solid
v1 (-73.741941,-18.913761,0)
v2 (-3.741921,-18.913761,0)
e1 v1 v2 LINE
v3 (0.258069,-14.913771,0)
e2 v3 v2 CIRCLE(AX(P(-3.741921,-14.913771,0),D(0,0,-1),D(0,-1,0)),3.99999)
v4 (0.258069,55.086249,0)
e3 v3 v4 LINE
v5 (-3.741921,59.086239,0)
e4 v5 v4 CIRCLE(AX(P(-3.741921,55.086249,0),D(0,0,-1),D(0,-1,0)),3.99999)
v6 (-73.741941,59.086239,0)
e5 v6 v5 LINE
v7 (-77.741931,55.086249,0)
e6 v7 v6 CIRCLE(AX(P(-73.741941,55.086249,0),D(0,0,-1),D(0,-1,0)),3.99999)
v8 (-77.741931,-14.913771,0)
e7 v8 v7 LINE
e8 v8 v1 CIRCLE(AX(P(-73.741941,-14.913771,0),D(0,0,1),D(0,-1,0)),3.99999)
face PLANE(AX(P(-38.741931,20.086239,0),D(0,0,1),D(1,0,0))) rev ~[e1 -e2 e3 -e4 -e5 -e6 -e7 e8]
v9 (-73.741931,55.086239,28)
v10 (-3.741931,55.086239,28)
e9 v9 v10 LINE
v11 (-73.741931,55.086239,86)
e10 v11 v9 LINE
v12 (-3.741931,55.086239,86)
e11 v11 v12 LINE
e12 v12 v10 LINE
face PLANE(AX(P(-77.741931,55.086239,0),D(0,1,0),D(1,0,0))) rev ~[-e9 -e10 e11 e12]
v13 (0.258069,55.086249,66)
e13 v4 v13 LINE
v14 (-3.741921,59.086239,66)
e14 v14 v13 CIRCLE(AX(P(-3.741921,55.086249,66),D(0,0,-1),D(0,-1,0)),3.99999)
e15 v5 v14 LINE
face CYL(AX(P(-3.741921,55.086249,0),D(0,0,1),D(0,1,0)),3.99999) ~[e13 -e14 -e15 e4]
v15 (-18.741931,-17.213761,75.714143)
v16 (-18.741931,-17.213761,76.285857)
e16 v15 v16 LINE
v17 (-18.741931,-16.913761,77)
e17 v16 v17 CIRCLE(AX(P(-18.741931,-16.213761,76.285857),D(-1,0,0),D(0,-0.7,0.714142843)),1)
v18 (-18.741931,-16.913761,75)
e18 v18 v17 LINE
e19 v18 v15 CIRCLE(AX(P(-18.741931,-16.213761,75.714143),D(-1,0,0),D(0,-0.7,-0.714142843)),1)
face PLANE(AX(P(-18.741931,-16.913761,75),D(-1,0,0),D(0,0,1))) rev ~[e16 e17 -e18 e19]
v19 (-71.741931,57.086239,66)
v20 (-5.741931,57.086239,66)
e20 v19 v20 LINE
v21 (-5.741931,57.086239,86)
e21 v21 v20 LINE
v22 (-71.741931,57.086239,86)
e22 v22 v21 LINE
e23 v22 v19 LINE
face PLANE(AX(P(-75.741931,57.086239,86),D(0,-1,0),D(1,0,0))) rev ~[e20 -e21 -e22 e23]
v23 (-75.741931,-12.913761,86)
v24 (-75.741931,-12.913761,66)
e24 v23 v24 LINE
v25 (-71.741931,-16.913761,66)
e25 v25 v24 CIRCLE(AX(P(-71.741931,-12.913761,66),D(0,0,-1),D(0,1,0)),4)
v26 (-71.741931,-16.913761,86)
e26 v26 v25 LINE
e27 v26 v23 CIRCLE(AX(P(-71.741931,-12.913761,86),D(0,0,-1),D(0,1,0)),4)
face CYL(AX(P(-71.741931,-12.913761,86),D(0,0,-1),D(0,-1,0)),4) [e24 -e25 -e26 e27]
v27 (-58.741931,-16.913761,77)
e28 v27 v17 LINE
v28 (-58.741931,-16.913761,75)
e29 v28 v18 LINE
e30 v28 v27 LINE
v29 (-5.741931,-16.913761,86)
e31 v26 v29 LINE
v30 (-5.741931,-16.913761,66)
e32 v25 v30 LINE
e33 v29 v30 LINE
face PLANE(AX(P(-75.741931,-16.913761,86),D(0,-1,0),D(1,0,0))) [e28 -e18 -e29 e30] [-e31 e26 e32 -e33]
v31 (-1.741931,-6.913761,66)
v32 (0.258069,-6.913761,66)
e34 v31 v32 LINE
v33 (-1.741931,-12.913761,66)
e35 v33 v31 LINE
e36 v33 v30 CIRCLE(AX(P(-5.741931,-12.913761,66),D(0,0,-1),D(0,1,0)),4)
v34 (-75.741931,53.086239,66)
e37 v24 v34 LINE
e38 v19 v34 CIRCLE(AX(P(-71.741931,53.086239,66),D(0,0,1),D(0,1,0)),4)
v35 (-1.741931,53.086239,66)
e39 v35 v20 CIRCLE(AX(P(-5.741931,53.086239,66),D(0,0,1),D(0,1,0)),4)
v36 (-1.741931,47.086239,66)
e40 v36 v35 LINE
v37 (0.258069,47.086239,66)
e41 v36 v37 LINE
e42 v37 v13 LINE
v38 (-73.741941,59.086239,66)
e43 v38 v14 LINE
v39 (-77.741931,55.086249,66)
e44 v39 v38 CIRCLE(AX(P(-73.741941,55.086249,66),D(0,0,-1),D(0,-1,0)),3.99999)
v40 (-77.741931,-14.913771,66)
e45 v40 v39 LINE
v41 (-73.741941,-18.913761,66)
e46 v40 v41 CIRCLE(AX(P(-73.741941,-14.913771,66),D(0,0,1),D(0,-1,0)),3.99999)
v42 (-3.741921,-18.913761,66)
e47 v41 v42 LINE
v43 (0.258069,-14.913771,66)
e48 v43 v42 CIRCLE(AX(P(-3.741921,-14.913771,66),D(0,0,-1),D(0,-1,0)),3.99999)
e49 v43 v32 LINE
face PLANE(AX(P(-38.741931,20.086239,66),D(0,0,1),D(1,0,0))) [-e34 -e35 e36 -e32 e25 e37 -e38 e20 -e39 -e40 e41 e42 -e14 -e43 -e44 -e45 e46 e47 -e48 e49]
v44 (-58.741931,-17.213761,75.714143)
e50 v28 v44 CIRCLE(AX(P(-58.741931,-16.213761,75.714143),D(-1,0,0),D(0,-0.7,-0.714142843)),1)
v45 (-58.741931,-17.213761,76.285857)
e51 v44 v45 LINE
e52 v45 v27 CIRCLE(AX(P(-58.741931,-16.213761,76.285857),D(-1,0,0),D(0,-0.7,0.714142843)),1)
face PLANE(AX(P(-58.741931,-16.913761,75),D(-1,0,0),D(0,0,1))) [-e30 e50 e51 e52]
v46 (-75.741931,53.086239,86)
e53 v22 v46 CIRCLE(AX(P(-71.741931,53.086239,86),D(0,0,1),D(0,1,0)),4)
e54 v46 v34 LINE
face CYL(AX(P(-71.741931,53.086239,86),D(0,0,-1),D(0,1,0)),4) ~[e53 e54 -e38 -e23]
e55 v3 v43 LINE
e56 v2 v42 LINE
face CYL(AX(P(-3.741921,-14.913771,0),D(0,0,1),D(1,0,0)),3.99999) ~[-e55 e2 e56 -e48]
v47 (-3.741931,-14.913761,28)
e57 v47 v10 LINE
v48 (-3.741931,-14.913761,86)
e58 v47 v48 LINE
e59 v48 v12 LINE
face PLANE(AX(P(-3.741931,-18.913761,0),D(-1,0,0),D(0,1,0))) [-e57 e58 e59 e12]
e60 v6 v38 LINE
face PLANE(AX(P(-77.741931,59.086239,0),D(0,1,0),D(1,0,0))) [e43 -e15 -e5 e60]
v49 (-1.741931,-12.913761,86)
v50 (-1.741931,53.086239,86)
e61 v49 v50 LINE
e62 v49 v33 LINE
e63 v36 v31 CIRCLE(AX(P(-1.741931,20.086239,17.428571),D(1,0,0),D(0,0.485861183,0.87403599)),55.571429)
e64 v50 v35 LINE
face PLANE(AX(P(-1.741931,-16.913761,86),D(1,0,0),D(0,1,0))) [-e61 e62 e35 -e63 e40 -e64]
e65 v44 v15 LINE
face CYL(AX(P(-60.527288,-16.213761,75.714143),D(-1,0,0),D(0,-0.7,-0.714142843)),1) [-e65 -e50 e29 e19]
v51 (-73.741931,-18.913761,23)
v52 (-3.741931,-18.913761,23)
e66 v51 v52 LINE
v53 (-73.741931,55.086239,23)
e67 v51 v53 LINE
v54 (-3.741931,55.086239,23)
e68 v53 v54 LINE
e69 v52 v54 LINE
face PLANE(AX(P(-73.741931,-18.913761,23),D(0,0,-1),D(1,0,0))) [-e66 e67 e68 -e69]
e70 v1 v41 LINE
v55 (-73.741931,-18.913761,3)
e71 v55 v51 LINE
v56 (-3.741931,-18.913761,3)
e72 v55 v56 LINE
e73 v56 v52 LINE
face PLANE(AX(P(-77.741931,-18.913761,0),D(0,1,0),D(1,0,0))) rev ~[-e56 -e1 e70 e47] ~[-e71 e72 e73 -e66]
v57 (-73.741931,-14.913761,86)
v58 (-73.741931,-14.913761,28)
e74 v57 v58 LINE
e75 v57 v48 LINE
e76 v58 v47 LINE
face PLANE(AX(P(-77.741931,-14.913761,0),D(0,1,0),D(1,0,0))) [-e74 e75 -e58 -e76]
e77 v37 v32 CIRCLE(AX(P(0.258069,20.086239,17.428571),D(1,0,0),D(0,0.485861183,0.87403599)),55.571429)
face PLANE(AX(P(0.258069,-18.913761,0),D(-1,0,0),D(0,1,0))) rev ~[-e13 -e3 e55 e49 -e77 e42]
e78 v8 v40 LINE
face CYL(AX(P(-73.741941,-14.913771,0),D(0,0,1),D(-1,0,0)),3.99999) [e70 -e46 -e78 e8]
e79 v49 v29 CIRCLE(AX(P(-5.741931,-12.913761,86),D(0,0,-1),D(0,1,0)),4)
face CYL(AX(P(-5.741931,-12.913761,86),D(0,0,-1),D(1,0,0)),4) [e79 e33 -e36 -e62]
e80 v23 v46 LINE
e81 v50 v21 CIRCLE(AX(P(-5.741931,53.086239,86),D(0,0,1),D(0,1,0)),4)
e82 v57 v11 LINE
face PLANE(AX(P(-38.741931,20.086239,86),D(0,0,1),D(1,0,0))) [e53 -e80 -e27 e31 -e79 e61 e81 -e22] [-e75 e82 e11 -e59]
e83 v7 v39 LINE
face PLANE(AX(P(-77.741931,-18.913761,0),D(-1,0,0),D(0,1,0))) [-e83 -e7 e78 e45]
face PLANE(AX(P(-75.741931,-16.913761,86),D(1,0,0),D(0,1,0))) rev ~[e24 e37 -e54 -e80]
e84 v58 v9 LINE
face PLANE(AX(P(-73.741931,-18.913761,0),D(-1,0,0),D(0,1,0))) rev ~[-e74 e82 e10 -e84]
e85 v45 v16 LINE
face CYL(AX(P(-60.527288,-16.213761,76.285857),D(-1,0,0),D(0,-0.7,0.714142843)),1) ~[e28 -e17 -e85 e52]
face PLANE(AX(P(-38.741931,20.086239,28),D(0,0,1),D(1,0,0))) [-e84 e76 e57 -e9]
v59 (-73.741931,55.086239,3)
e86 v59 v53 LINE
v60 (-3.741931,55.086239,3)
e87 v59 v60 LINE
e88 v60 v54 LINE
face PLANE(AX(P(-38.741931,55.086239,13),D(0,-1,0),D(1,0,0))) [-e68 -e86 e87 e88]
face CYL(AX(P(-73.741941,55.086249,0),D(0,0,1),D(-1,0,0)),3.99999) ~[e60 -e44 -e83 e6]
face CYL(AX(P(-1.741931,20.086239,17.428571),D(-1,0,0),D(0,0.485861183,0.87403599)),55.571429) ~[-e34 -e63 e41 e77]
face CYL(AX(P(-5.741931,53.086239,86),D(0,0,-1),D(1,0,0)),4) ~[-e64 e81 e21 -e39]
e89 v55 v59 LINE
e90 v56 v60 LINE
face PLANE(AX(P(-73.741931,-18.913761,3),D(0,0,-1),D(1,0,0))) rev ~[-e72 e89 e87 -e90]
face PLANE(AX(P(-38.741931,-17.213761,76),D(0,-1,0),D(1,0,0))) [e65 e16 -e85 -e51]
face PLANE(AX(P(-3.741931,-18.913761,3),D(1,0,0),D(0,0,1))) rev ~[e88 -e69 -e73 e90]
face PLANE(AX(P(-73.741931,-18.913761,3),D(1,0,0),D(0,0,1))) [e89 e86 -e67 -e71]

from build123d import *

# Parameters (mm, degrees)
F0_W         = 78
F0_H         = 78
F1_DEPTH     = 86
F2_T         = -4
F4_DEPTH     = 24
F3_W         = 70
F3_H         = 20
F5_DEPTH     = 74
F6_W         = 78
F6_H         = 78
F6_W_2       = 74
F6_H_2       = 74
F7_DEPTH     = 20
F9_DEPTH     = 2
F10_R        = 3.99999
F11_R        = 4
F12_W        = 40
F12_H        = 2
F13_DEPTH    = 0.3
F14_T1_DEPTH = 43.5707142143
F15_T1_DEPTH = 43.5707142143


# Not quite as in the source:
# - a fillet or chamfer that OpenCascade refuses, or shapes differently, is made with other operations: its cross-section is extruded or revolved along the edge and cut away or added
# - a fillet or chamfer is up to 0.001 mm smaller than in the source, because OpenCascade refuses the exact size


with BuildPart() as f1:
    # F0 (on Top) → F1 (new body)
    with BuildSketch(Plane.XY):
        with Locations((-38.7419309749, 20.0862393249)):
            Rectangle(F0_W, F0_H)
    extrude(amount=F1_DEPTH)

    # F2
    f2_openings = [f1.faces().sort_by_distance(p)[0] for p in [
        (-38.741931, 20.086239, 86),
    ]]
    offset(amount=F2_T, openings=f2_openings)

    # F4 (add): a face of the model
    f4_faces = [f1.faces().sort_by_distance(p)[0] for p in [
        (-38.7419309749, 20.0862393249, 4),
    ]]
    extrude(f4_faces, amount=F4_DEPTH)

    # F3 (on face) → F5 (cut)
    with BuildSketch(Plane.XZ.offset(18.9137606751)):
        with Locations((-38.7419309749, 13)):
            Rectangle(F3_W, F3_H)
    extrude(amount=-F5_DEPTH, mode=Mode.SUBTRACT)

    # F6 (on face) → F7 (cut)
    with BuildSketch(Plane.XY.offset(86)):
        with Locations((-38.7419309749, 20.0862393249)):
            Rectangle(F6_W, F6_H)
        with Locations((-38.7419309749, 20.0862393249)):
            Rectangle(F6_W_2, F6_H_2, mode=Mode.SUBTRACT)
    extrude(amount=-F7_DEPTH, mode=Mode.SUBTRACT)

    # F8 (on face) → F9 (join)
    with BuildSketch(Plane.YZ.offset(-1.7419309749)):
        with BuildLine():
            Line((-6.9137606751, 66), (47.0862393249, 66))
            ThreePointArc((47.0862393249, 66), (20.0862393249, 73), (-6.9137606751, 66))
        make_face()
    extrude(amount=F9_DEPTH)

    # F10 (radius 4 in the source; OpenCascade refuses exactly that, so slightly less here)
    f10_edges = [f1.edges().sort_by_distance(p)[0] for p in [
        (-77.741931, -18.913761, 33),
        (0.258069, -18.913761, 33),
        (0.258069, 59.086239, 33),
        (-77.741931, 59.086239, 33),
    ]]
    fillet(f10_edges, radius=F10_R)

    # F11
    f11_edges = [f1.edges().sort_by_distance(p)[0] for p in [
        (-1.741931, -16.913761, 76),
        (-1.741931, 57.086239, 76),
        (-75.741931, -16.913761, 76),
        (-75.741931, 57.086239, 76),
    ]]
    fillet(f11_edges, radius=F11_R)

    # F12 (on face) → F13 (join)
    with BuildSketch(Plane.XZ.offset(16.9137606751)):
        with Locations((-38.7419309749, 76)):
            Rectangle(F12_W, F12_H)
    extrude(amount=F13_DEPTH)

    # F14: fillet of radius 1 on 1 edges, made by hand

    # F14_s2 → F14_t1 (cut)
    with BuildSketch(Plane.YZ.offset(-60.527288082)):
        with BuildLine():
            ThreePointArc((-16.9137606751, 77), (-17.1357151208, 76.6731554918), (-17.2137606751, 76.2858571571))
            Line((-17.2137606751, 76.2858571571), (-17.2137606751, 77))
            Line((-17.2137606751, 77), (-16.9137606751, 77))
        make_face()
    extrude(amount=F14_T1_DEPTH, mode=Mode.SUBTRACT)

    # F15: fillet of radius 1 on 1 edges, made by hand

    # F15_s2 → F15_t1 (cut)
    with BuildSketch(Plane.YZ.offset(-60.527288082)):
        with BuildLine():
            ThreePointArc((-16.9137606751, 75), (-17.1357151208, 75.3268445082), (-17.2137606751, 75.7141428429))
            Line((-17.2137606751, 75.7141428429), (-17.2137606751, 75))
            Line((-17.2137606751, 75), (-16.9137606751, 75))
        make_face()
    extrude(amount=F15_T1_DEPTH, mode=Mode.SUBTRACT)


solid = f1.part
